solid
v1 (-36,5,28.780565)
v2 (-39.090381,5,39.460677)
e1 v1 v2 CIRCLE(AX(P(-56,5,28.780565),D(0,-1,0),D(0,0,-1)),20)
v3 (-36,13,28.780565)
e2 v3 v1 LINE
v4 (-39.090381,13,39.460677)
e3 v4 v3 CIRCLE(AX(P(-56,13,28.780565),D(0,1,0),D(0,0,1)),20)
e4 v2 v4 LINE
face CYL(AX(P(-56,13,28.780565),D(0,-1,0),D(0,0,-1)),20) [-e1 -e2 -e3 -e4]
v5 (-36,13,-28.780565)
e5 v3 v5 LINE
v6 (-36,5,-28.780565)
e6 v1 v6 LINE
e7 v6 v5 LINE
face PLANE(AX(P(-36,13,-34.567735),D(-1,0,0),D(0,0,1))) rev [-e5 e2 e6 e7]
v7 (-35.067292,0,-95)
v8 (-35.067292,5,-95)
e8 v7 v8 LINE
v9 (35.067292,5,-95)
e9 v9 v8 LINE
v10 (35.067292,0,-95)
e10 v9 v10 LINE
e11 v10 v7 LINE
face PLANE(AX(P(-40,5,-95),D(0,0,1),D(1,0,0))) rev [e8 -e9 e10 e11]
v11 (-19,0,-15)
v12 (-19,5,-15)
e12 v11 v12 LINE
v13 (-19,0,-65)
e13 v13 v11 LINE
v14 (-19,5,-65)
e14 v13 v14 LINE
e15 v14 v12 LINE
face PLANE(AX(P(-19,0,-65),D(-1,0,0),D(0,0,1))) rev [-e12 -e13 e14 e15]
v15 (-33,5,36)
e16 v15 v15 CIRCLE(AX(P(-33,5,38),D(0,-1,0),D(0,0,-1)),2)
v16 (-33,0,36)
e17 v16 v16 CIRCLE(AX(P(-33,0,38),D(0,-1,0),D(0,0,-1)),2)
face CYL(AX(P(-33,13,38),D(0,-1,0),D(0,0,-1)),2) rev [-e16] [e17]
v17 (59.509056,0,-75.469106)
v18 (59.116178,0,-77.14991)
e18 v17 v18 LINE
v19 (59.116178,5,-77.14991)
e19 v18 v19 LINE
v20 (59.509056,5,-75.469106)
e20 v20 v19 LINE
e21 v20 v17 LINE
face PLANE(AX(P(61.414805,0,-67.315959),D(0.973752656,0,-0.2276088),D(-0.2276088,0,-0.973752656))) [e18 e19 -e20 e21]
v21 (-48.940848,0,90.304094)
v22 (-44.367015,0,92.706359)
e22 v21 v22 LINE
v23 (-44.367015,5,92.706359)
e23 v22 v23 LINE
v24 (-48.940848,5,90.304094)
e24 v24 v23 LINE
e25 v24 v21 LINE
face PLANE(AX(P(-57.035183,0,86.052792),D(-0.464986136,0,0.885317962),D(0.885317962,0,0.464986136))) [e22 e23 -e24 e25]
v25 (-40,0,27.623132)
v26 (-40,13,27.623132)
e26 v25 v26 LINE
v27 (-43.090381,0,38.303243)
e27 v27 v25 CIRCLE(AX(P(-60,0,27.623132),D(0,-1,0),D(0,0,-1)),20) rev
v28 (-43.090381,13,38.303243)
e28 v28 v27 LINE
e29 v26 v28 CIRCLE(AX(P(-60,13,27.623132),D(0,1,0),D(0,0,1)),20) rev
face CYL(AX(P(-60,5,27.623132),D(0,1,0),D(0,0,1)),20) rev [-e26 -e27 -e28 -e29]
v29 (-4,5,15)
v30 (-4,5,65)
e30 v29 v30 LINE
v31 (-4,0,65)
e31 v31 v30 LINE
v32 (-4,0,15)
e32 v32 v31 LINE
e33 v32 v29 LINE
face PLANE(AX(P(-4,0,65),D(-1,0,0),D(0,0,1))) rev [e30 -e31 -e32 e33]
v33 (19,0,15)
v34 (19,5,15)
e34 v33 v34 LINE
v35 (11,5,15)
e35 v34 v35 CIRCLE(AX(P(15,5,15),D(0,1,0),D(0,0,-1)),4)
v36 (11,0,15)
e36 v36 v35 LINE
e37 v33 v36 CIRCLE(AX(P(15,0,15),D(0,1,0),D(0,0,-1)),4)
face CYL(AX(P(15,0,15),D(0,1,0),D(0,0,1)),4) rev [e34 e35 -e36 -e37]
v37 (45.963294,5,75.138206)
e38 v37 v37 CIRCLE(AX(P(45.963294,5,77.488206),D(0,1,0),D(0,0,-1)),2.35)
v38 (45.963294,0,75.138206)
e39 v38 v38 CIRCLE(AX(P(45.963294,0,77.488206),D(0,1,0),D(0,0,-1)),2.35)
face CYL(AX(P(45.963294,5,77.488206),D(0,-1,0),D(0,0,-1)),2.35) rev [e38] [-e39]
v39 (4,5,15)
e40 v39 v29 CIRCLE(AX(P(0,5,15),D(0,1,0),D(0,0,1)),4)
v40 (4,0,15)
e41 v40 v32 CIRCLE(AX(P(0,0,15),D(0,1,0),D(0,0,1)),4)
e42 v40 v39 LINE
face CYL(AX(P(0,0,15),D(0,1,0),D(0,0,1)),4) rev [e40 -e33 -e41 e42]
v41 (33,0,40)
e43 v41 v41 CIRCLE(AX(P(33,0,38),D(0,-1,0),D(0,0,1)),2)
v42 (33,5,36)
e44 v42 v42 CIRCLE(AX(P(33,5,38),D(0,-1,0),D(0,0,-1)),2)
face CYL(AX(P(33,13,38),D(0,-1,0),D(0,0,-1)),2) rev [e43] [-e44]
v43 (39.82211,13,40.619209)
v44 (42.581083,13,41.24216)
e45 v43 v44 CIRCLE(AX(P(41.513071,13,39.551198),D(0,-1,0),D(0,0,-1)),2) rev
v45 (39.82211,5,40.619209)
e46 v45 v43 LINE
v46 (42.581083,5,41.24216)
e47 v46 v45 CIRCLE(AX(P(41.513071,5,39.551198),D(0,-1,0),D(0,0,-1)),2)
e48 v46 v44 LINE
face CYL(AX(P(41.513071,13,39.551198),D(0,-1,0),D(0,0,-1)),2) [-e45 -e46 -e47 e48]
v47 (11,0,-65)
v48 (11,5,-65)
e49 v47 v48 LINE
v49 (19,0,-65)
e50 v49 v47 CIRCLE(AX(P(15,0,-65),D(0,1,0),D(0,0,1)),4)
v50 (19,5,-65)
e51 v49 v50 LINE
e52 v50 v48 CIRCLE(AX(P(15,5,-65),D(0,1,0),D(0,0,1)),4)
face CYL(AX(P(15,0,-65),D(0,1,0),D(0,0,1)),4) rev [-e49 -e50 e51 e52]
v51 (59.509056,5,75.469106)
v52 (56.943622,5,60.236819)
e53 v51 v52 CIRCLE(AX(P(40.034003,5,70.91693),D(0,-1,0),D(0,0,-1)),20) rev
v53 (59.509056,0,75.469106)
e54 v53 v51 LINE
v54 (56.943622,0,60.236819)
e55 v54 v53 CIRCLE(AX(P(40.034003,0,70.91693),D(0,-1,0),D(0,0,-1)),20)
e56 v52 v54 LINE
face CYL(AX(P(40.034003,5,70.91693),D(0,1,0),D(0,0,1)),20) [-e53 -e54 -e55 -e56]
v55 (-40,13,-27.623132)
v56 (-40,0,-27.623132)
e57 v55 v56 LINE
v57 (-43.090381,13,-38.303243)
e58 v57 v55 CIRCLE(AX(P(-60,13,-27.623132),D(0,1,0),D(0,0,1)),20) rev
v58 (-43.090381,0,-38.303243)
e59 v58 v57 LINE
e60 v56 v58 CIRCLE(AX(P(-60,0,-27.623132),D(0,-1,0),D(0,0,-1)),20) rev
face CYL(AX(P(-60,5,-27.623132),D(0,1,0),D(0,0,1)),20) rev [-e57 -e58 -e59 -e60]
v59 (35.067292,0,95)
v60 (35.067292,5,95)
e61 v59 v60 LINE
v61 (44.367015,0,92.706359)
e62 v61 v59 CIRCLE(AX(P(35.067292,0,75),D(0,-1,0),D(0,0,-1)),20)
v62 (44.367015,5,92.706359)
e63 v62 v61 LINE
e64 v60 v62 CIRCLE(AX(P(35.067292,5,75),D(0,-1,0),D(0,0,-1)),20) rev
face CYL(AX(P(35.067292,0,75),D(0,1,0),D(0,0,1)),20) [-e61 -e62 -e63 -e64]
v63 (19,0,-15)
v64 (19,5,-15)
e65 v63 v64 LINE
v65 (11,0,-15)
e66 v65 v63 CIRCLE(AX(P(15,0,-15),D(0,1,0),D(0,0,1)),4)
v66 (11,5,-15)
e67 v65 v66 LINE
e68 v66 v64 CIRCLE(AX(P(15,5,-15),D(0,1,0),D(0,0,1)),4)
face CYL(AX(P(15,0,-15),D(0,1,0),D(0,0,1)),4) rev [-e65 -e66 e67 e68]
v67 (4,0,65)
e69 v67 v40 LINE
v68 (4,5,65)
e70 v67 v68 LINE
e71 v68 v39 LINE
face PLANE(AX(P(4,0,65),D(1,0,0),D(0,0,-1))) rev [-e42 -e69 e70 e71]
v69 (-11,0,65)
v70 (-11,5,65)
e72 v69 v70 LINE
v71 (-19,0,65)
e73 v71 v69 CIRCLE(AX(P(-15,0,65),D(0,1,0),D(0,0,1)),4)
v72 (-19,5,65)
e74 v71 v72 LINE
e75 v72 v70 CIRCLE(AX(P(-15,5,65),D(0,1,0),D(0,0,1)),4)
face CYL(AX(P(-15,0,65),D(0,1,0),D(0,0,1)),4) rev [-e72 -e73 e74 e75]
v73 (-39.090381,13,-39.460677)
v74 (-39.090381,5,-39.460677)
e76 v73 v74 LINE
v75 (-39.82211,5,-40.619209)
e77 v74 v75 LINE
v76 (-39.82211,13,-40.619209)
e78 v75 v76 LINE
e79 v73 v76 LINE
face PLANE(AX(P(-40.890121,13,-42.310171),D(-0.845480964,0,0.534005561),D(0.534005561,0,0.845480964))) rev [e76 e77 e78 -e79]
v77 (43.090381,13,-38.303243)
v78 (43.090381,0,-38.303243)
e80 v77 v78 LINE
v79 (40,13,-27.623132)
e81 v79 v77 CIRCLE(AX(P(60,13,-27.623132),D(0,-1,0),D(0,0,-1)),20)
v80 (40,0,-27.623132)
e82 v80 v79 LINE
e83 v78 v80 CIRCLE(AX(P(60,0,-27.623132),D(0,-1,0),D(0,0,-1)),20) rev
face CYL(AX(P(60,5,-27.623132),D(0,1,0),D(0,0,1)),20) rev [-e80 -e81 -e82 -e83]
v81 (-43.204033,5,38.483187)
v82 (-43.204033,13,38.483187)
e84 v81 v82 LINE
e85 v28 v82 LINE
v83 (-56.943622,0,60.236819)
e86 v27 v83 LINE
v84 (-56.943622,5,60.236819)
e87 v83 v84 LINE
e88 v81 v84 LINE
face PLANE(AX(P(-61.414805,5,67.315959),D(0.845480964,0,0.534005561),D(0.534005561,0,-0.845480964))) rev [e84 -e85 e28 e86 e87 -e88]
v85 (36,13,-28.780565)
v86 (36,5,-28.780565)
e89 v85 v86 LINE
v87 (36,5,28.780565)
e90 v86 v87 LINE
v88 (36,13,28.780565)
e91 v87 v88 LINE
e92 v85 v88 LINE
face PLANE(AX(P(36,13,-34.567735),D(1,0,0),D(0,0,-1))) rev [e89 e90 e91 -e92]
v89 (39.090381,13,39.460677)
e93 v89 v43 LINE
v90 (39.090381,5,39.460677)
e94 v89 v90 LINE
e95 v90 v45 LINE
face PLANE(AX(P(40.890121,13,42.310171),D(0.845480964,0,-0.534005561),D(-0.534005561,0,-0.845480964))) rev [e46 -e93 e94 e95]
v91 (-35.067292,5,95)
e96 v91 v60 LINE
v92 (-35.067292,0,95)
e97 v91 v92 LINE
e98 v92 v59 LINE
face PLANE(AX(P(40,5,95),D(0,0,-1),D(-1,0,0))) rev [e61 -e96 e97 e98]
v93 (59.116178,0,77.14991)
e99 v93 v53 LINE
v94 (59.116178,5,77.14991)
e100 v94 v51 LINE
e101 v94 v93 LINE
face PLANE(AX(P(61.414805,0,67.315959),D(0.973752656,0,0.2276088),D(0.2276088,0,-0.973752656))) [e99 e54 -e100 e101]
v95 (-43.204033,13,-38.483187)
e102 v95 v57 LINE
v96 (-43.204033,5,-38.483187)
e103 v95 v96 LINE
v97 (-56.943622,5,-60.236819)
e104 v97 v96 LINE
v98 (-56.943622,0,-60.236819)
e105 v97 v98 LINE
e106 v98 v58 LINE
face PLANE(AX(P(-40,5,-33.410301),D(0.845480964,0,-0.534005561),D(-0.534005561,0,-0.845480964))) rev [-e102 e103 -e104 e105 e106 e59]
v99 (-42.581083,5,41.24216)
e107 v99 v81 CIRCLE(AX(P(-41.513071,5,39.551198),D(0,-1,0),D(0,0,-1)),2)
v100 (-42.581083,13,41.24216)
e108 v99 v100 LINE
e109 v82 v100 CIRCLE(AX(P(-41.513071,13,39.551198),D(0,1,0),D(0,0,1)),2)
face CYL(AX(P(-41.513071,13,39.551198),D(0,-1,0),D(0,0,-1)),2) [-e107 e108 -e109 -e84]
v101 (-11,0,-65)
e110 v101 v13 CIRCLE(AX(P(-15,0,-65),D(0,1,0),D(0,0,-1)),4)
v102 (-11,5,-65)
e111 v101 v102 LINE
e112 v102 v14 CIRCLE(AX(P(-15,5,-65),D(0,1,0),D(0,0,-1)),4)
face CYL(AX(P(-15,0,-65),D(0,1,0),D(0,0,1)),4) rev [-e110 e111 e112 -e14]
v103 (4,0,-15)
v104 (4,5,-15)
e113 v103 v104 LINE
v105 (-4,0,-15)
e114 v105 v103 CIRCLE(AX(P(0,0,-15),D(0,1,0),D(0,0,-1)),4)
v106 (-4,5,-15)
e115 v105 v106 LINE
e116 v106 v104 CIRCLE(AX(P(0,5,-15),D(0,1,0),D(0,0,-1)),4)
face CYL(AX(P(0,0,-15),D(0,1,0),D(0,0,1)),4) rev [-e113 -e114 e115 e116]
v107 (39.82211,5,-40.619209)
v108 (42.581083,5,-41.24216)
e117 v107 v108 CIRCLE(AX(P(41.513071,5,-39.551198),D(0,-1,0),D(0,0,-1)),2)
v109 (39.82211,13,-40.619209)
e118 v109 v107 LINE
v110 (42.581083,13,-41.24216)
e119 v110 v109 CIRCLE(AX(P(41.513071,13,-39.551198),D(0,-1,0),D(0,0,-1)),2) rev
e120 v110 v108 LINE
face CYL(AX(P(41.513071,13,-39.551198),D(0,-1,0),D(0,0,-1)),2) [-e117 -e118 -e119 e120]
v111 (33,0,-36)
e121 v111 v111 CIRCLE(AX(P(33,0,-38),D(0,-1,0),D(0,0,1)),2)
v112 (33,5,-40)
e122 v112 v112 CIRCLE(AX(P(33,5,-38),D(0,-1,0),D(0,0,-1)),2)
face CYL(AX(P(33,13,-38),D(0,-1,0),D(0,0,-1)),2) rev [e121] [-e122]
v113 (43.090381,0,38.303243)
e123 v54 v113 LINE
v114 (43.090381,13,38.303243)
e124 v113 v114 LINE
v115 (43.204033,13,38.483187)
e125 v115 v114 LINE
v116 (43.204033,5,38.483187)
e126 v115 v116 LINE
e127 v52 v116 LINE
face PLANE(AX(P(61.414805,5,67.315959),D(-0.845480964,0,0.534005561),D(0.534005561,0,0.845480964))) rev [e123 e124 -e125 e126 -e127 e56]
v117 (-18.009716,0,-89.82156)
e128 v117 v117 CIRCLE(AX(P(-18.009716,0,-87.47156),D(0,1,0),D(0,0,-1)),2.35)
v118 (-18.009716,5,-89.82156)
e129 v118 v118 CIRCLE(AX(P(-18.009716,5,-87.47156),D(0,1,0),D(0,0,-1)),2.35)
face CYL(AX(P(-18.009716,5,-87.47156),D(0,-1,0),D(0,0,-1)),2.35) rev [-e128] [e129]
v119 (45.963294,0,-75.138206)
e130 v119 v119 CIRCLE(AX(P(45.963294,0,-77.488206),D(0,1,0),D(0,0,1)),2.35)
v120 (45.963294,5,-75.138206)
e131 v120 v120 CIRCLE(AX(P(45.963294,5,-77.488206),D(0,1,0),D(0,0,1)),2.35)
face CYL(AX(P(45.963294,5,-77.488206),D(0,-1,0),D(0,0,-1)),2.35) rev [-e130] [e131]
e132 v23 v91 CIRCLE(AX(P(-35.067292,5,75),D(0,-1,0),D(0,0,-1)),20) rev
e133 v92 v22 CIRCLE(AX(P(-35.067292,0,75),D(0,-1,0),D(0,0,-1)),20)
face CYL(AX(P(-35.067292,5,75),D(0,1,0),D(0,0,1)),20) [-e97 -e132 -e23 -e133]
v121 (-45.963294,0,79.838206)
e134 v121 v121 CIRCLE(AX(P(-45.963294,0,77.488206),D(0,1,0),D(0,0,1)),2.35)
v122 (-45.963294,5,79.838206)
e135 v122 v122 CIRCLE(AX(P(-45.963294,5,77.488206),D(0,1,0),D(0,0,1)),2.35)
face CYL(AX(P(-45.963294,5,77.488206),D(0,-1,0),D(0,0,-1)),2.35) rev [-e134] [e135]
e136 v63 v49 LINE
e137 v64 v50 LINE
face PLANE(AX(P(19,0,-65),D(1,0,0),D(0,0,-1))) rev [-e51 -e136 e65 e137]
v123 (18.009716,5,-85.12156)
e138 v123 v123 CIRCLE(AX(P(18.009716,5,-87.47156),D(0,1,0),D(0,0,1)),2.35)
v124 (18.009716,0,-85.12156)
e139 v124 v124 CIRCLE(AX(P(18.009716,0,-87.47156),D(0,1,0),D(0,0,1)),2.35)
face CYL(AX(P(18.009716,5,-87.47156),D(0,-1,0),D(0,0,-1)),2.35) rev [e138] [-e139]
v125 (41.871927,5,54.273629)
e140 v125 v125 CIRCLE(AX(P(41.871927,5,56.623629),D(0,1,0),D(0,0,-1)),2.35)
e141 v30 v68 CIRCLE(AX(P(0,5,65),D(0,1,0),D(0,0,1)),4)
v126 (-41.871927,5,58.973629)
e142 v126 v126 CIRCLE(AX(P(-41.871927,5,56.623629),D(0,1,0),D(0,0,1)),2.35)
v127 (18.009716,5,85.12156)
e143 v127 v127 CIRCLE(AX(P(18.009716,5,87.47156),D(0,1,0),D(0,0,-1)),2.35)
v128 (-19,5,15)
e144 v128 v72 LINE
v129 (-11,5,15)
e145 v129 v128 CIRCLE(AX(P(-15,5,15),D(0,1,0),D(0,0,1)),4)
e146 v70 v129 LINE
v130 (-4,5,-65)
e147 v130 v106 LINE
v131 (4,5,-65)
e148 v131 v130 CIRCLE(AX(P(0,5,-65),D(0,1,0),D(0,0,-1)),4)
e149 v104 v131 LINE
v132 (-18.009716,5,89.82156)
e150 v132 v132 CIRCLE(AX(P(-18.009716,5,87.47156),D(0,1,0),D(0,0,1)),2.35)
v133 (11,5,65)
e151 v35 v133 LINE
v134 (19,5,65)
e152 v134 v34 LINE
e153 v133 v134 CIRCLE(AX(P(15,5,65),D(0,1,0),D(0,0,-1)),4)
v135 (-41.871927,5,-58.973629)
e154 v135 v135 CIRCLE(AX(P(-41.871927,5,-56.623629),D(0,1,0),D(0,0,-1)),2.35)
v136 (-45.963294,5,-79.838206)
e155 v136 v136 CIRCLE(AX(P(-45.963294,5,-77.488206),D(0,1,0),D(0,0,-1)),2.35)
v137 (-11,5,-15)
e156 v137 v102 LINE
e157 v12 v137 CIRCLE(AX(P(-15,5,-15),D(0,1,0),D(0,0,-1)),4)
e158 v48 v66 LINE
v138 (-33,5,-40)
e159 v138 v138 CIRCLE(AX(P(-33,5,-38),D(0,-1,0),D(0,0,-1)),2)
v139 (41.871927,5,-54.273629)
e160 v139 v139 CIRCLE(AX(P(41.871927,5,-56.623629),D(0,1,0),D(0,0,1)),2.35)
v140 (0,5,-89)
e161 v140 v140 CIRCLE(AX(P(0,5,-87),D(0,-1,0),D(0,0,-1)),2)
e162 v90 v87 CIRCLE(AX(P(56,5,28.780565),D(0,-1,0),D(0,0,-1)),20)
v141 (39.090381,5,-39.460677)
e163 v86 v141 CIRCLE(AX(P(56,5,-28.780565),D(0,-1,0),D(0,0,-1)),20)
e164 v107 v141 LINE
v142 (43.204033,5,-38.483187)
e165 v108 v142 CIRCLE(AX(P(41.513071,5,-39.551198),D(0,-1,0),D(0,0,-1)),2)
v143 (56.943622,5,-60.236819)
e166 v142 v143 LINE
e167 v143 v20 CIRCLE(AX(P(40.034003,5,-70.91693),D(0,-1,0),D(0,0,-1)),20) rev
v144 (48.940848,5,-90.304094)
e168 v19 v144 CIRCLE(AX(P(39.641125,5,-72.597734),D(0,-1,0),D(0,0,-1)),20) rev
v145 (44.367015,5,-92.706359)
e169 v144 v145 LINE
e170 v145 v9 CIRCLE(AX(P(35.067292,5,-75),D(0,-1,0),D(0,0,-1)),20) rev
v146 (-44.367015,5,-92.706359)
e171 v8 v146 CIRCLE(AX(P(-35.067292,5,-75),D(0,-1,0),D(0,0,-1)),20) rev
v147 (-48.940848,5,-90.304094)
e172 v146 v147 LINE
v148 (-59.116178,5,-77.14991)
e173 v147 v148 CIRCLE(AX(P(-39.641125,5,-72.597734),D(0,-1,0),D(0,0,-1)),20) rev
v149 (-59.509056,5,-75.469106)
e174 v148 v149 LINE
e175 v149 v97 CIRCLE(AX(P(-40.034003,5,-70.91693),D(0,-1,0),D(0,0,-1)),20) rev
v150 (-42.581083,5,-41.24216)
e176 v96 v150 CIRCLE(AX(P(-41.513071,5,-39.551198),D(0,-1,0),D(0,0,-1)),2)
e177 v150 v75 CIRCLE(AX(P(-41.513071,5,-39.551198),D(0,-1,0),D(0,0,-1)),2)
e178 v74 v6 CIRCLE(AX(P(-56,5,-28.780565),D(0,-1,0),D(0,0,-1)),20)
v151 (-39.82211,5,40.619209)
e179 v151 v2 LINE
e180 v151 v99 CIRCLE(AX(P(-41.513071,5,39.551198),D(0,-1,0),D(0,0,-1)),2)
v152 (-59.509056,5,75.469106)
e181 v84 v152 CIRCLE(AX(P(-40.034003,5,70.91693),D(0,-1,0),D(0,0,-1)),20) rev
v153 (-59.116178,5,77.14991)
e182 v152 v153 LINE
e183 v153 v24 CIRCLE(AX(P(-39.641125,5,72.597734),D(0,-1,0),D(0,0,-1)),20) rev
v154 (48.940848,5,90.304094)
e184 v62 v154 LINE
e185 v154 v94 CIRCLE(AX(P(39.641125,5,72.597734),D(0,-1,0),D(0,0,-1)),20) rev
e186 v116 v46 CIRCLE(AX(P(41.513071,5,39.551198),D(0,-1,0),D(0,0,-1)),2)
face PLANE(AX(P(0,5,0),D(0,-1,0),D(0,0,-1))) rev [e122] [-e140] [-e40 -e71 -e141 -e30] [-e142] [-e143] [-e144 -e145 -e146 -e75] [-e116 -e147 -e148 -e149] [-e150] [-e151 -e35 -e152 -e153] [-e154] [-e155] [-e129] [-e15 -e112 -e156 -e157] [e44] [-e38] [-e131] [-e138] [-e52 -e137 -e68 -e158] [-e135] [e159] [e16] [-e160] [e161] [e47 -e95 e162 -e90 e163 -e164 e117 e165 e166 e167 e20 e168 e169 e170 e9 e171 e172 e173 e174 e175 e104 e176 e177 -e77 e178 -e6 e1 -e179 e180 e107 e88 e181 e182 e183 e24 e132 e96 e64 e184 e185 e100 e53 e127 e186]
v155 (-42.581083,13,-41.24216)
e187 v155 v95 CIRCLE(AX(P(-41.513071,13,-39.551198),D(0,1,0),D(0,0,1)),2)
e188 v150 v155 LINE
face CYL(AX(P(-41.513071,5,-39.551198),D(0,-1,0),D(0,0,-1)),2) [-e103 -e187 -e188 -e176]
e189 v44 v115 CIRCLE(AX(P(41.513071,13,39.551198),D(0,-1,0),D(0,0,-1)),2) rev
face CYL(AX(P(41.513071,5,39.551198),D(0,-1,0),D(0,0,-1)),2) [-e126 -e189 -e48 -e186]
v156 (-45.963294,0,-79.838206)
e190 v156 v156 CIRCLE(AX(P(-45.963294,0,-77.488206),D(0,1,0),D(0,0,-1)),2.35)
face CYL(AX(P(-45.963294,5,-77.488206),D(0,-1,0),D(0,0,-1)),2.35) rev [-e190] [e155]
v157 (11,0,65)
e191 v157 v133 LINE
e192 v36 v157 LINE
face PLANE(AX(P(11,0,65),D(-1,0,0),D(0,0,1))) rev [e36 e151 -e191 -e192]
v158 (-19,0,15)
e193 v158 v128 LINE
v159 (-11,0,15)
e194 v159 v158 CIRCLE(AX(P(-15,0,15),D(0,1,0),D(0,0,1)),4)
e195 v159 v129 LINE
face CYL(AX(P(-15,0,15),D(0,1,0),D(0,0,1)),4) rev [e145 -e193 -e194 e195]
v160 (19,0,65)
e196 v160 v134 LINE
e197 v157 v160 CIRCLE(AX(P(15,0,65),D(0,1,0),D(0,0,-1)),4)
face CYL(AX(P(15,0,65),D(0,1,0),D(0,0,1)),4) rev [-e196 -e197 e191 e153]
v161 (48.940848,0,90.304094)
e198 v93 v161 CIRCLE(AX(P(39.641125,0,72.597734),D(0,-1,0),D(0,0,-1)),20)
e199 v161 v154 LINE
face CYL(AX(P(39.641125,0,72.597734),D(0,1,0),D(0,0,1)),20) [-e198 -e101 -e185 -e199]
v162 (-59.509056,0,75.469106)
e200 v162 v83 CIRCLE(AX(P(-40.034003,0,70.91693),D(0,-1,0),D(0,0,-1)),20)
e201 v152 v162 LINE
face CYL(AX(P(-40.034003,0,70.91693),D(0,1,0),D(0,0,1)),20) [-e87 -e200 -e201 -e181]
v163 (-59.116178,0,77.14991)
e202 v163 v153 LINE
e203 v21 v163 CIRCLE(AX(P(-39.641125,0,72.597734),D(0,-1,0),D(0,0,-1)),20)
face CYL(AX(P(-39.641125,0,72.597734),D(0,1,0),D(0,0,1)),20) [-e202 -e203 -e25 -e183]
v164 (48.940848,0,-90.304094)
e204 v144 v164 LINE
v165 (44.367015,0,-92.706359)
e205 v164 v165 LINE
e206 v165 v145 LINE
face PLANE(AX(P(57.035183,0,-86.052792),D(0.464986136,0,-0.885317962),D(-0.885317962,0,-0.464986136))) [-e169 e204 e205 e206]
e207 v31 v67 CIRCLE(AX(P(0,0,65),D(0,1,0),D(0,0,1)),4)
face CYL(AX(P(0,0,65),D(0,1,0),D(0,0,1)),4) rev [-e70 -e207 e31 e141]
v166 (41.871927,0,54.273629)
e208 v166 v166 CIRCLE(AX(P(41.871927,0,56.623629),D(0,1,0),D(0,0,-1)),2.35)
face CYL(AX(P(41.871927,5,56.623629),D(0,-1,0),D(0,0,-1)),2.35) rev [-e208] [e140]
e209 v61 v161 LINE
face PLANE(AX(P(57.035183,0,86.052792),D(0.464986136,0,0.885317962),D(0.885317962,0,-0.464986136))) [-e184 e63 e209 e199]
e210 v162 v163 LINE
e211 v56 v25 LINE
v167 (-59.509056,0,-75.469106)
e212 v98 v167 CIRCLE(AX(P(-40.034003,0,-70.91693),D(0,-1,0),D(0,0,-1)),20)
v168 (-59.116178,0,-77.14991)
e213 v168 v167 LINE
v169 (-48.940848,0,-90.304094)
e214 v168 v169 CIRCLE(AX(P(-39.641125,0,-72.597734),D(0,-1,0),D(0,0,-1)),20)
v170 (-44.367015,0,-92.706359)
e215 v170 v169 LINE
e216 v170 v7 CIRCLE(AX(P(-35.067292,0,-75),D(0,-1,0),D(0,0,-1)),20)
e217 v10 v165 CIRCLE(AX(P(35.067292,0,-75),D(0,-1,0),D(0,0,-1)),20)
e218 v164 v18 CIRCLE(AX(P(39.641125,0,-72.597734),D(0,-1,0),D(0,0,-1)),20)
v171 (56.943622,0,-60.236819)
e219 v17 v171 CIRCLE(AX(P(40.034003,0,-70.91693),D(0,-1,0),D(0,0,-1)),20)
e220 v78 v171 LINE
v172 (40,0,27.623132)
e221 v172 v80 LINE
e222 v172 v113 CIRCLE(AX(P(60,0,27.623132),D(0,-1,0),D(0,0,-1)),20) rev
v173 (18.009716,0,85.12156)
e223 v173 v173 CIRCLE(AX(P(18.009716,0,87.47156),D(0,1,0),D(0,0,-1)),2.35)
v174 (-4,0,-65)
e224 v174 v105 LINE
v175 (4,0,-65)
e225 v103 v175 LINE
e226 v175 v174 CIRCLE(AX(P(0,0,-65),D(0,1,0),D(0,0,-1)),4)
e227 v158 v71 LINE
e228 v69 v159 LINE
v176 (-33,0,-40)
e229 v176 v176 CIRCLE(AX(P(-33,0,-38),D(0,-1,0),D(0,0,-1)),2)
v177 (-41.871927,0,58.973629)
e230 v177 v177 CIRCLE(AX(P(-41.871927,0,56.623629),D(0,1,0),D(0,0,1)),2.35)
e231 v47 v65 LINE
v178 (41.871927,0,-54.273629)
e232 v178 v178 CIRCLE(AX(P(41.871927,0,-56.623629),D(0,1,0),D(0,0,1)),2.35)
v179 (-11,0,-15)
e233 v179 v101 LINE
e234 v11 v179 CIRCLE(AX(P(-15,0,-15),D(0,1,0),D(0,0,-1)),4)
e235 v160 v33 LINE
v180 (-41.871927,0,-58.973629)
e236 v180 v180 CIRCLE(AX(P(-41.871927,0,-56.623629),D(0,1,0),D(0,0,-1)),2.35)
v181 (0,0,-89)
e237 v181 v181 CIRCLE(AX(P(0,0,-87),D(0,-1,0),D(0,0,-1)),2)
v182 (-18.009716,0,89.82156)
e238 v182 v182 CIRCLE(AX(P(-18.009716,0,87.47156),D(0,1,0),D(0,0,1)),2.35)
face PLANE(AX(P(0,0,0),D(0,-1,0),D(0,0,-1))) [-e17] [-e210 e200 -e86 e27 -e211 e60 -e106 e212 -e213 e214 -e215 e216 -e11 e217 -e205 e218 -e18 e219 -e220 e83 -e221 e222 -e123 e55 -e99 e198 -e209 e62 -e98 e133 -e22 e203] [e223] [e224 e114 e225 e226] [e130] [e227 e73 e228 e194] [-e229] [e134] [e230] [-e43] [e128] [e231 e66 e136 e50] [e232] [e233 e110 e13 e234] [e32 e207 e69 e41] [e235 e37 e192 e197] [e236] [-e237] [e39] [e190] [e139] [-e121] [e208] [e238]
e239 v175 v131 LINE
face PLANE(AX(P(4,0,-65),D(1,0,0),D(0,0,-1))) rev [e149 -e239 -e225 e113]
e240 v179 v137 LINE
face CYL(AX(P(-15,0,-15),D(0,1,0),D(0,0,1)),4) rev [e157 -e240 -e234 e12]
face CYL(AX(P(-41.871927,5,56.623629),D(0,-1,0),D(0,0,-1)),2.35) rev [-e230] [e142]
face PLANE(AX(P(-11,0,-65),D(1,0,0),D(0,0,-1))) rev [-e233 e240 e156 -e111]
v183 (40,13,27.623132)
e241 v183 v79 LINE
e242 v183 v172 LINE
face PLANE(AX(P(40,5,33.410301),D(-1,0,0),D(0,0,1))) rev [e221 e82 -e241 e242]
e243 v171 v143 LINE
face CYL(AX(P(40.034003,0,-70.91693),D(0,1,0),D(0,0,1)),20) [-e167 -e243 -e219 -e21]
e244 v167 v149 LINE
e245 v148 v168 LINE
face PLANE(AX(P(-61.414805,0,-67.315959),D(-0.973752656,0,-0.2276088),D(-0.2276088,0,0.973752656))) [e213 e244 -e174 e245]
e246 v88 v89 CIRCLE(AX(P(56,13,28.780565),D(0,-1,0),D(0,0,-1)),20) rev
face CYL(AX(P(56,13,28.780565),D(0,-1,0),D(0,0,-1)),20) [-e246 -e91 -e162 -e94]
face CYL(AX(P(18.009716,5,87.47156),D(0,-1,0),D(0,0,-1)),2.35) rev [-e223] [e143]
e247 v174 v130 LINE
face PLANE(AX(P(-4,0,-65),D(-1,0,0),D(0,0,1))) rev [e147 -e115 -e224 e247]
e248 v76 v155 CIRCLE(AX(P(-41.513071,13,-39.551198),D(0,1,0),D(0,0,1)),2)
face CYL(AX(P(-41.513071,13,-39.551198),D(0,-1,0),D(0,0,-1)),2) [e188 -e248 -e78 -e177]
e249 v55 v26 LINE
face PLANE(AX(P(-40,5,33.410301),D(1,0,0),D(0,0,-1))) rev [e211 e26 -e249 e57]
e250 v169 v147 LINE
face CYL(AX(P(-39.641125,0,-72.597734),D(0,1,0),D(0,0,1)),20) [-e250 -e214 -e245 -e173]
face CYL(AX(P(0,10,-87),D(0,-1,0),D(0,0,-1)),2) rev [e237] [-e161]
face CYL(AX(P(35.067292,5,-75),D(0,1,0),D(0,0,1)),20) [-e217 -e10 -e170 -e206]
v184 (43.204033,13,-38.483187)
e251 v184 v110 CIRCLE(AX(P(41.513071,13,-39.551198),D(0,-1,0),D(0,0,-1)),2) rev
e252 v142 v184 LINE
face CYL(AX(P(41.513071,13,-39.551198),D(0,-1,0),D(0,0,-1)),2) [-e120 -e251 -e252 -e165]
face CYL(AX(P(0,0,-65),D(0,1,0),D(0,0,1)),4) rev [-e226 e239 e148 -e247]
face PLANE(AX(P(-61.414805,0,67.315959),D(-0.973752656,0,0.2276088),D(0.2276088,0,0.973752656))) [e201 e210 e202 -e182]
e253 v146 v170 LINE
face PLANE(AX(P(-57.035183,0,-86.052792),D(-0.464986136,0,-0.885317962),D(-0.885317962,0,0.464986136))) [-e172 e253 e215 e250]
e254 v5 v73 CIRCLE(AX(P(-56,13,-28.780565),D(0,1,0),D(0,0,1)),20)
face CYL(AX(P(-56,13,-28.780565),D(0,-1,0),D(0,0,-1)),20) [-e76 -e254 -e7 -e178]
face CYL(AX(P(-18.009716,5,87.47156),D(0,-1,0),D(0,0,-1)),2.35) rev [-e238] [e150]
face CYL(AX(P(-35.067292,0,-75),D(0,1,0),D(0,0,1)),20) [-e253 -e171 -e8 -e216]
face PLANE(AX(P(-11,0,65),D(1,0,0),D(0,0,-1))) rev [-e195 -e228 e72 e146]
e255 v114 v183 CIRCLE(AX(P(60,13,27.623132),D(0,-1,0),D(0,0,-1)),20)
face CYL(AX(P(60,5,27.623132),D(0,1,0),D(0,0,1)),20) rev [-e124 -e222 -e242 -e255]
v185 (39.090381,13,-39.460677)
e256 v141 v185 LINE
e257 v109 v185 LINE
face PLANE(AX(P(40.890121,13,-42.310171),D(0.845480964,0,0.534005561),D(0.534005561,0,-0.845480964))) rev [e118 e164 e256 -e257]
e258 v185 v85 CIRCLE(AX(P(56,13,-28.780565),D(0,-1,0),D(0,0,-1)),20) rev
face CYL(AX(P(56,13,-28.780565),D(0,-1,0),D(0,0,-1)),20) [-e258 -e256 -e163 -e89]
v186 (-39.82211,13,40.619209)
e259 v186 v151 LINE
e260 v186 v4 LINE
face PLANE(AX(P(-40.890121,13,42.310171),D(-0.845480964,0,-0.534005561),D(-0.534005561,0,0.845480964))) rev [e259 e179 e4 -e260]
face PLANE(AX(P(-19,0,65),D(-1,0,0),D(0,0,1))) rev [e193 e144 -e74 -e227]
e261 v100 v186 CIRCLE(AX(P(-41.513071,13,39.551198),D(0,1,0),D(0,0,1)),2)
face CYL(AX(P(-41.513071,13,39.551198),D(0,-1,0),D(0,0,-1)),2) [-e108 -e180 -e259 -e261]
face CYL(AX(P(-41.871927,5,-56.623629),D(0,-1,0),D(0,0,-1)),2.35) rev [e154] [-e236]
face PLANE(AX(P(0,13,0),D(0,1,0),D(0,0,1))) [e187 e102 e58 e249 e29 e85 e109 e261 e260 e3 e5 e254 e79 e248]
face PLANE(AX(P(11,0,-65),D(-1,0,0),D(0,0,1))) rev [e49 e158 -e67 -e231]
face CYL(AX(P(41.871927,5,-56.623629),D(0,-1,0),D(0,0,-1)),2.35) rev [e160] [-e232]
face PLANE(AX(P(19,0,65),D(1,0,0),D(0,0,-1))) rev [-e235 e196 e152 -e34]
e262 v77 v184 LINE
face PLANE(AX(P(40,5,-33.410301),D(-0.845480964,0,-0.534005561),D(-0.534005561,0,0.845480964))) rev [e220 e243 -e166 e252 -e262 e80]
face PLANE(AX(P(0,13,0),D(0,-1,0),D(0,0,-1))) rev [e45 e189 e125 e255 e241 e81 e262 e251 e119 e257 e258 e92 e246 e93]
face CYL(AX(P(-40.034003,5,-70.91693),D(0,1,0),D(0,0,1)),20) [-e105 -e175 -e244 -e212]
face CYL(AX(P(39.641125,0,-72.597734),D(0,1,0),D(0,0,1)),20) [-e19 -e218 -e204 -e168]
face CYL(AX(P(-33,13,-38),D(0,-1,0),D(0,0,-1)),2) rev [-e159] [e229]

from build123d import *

# Parameters (mm, degrees)
ESQUISSE1_R             = 2.3500000000000014
ESQUISSE1_R_2           = 2.3499999999999983
ESQUISSE1_R_3           = 2.349999999999996
BOSS_EXTRU_1_DEPTH      = 5
BOSS_EXTRU_2_DEPTH      = 8
CONG_3_R                = 2
CONG_4_R                = 20
ESQUISSE4_R             = 2.0000000000000036
ENL_V_MAT_EXTRU_1_DEPTH = 114.86737128447481
CONG_5_R                = 20
ENL_V_MAT_EXTRU_2_DEPTH = 114.40537131563231
BOSS_EXTRU_3_DEPTH      = 5
CONG_6_R                = 20
CONG_7_R                = 20
ESQUISSE7_R             = 2.000000000000001
ENL_V_MAT_EXTRU_3_DEPTH = 10


with BuildPart() as part:
    # Esquisse1 → Boss.-Extru.1 (new body)
    with BuildSketch(Plane(origin=(0, 0, 0), x_dir=(1, 0, 0), z_dir=(0, 1, 0))):
        Polygon((39.99999999999999, -95.00000000000003), (-40, -95.00000000000001), (-61.41480475615327, -67.3159587983287), (-40, -33.41030108504288), (-40, 33.41030108504288), (-61.41480475615327, 67.31595879832868), (-39.99999999999999, 95.00000000000001), (39.99999999999999, 95.00000000000003), (61.414804756153316, 67.31595879832868), (40.000000000000014, 33.41030108504289), (40.000000000000014, -33.41030108504289), (61.414804756153316, -67.31595879832868), align=None)
        with Locations(Location((18.009715939773823, 87.47156012506183, 0), (0, 0, 270))):
            Circle(ESQUISSE1_R, mode=Mode.SUBTRACT)
        with Locations(Location((45.96329382727553, 77.48820598648535, 0), (0, 0, 270))):
            Circle(ESQUISSE1_R_2, mode=Mode.SUBTRACT)
        with Locations(Location((41.871926953773496, 56.623628500342335, 0), (0, 0, 270))):
            Circle(ESQUISSE1_R_3, mode=Mode.SUBTRACT)
        with Locations(Location((-41.871926953773496, 56.623628500342335, 0), (0, 0, 90))):
            Circle(ESQUISSE1_R_3, mode=Mode.SUBTRACT)
        with Locations(Location((-45.96329382727553, 77.48820598648535, 0), (0, 0, 90))):
            Circle(ESQUISSE1_R_2, mode=Mode.SUBTRACT)
        with Locations(Location((-18.009715939773823, 87.47156012506183, 0), (0, 0, 90))):
            Circle(ESQUISSE1_R, mode=Mode.SUBTRACT)
        with Locations(Location((41.871926953773496, -56.623628500342335, 0), (0, 0, 90))):
            Circle(ESQUISSE1_R_3, mode=Mode.SUBTRACT)
        with Locations(Location((45.963293827275415, -77.48820598648535, 0), (0, 0, 90))):
            Circle(ESQUISSE1_R_2, mode=Mode.SUBTRACT)
        with Locations(Location((18.00971593977377, -87.47156012506183, 0), (0, 0, 90))):
            Circle(ESQUISSE1_R, mode=Mode.SUBTRACT)
        with Locations(Location((-18.00971593977388, -87.47156012506183, 0), (0, 0, 270))):
            Circle(ESQUISSE1_R, mode=Mode.SUBTRACT)
        with Locations(Location((-45.96329382727556, -77.48820598648535, 0), (0, 0, 270))):
            Circle(ESQUISSE1_R_2, mode=Mode.SUBTRACT)
        with Locations(Location((-41.871926953773496, -56.623628500342335, 0), (0, 0, 270))):
            Circle(ESQUISSE1_R_3, mode=Mode.SUBTRACT)
    extrude(amount=BOSS_EXTRU_1_DEPTH)

    # Esquisse3 → Boss.-Extru.2 (add)
    with BuildSketch(Plane(origin=(0, 5, 0), x_dir=(1, 0, 0), z_dir=(0, 1, 0))):
        Polygon((40.000000000000014, -33.41030108504289), (40.000000000000014, 33.41030108504289), (44.27204448885784, 40.174148798084595), (40.89012063233698, 42.31017104251351), (36.00000000000002, 34.567734993029916), (36.00000000000003, -34.56773499302995), (40.89012063233698, -42.31017104251351), (44.27204448885783, -40.174148798084595), align=None)
        Polygon((-40.89012063233699, -42.31017104251351), (-36.00000000000003, -34.56773499302995), (-36.00000000000002, 34.567734993029916), (-40.89012063233698, 42.31017104251351), (-44.272044488857844, 40.174148798084595), (-40.000000000000014, 33.41030108504289), (-40.000000000000014, -33.41030108504289), (-44.27204448885783, -40.174148798084595), align=None)
    extrude(amount=BOSS_EXTRU_2_DEPTH)

    # Congé3
    cong_3_edges = [part.edges().sort_by_distance(p)[0] for p in [
        (-40.89012063233698, 9, -42.31017104251351),
        (-44.272044488857844, 9, -40.174148798084595),
        (-44.27204448885783, 9, 40.174148798084595),
        (-40.89012063233699, 9, 42.31017104251351),
        (40.89012063233698, 9, 42.31017104251351),
        (44.27204448885783, 9, 40.174148798084595),
        (40.89012063233698, 9, -42.31017104251351),
        (44.27204448885784, 9, -40.174148798084595),
    ]]
    fillet(cong_3_edges, radius=CONG_3_R - 0.0001)  # a hair under: the kernel refuses the full size

    # Congé4
    cong_4_edges = [part.edges().sort_by_distance(p)[0] for p in [
        (-40.00000000000001, 6.5, 33.41030108504289),
        (-40.00000000000001, 6.5, -33.41030108504289),
        (40.000000000000014, 6.5, -33.41030108504289),
        (40.000000000000014, 6.5, 33.41030108504289),
    ]]
    fillet(cong_4_edges, radius=CONG_4_R)

    # Esquisse4 → Enlèv. mat.-Extru.1 (cut, through all)
    with BuildSketch(Plane(origin=(0, 0, 0), x_dir=(-1, 0, 0), z_dir=(0, -1, 0))):
        with Locations(Location((32.99999999999999, -38.000000000000014, 0), (0, 0, 90))):
            Circle(ESQUISSE4_R)
        with Locations(Location((33.00000000000002, 38, 0), (0, 0, 90))):
            Circle(ESQUISSE4_R)
        with Locations(Location((-32.99999999999999, -38.000000000000014, 0), (0, 0, 90))):
            Circle(ESQUISSE4_R)
        with Locations(Location((-33.00000000000002, 38, 0), (0, 0, 90))):
            Circle(ESQUISSE4_R)
    extrude(amount=-ENL_V_MAT_EXTRU_1_DEPTH, mode=Mode.SUBTRACT)

    # Congé5
    cong_5_edges = [part.edges().sort_by_distance(p)[0] for p in [
        (-36.00000000000003, 9, 34.56773499302995),
        (-36.00000000000002, 9, -34.567734993029916),
        (36.00000000000002, 9, -34.567734993029916),
        (36.00000000000003, 9, 34.56773499302995),
    ]]
    fillet(cong_5_edges, radius=CONG_5_R)

    # Esquisse5 → Enlèv. mat.-Extru.2 (cut, through all)
    with BuildSketch(Plane(origin=(0, 5, 0), x_dir=(1, 0, 0), z_dir=(0, 1, 0))):
        with BuildLine():
            Line((-19, -65), (-19.00000000000001, -15))
            ThreePointArc((-19.00000000000001, -15), (-15.000000000000002, -10.999999999999979), (-10.999999999999988, -15.000000000000014))
            Line((-10.999999999999988, -15.000000000000014), (-10.999999999999979, -64.99999999999999))
            ThreePointArc((-10.999999999999979, -64.99999999999999), (-14.999999999999993, -69), (-19, -65))
        make_face()
        with BuildLine():
            Line((19.00000000000002, -64.99999999999999), (19.00000000000001, -15))
            ThreePointArc((19.00000000000001, -15), (15.000000000000005, -10.999999999999961), (10.99999999999997, -15.000000000000007))
            Line((10.99999999999997, -15.000000000000007), (10.999999999999979, -64.99999999999999))
            ThreePointArc((10.999999999999979, -64.99999999999999), (15.000000000000016, -68.99999999999999), (19.00000000000002, -64.99999999999999))
        make_face()
        with BuildLine():
            Line((19.00000000000002, 64.99999999999999), (19.00000000000001, 15))
            ThreePointArc((19.00000000000001, 15), (15.000000000000009, 10.99999999999998), (10.99999999999999, 15))
            Line((10.99999999999999, 15), (10.999999999999979, 64.99999999999999))
            ThreePointArc((10.999999999999979, 64.99999999999999), (15.000000000000016, 68.99999999999999), (19.00000000000002, 64.99999999999999))
        make_face()
        with BuildLine():
            Line((-19.00000000000002, 64.99999999999999), (-19.00000000000001, 15))
            ThreePointArc((-19.00000000000001, 15), (-15.000000000000009, 10.99999999999998), (-10.99999999999999, 15))
            Line((-10.99999999999999, 15), (-10.999999999999979, 64.99999999999999))
            ThreePointArc((-10.999999999999979, 64.99999999999999), (-15.000000000000016, 68.99999999999999), (-19.00000000000002, 64.99999999999999))
        make_face()
        with BuildLine():
            Line((-4, -64.99999999999999), (-4, -15))
            ThreePointArc((-4, -15), (2.4e-16, -11), (4, -15))
            Line((4, -15), (4, -64.99999999999999))
            ThreePointArc((4, -64.99999999999999), (-7.3e-16, -68.99999999999999), (-4, -64.99999999999999))
        make_face()
        with BuildLine():
            Line((-4, 64.99999999999999), (-4, 15))
            ThreePointArc((-4, 15), (2.4e-16, 11), (4, 15))
            Line((4, 15), (4, 64.99999999999999))
            ThreePointArc((4, 64.99999999999999), (2.4e-16, 68.99999999999999), (-4, 64.99999999999999))
        make_face()
    extrude(amount=-ENL_V_MAT_EXTRU_2_DEPTH, mode=Mode.SUBTRACT)

    # Esquisse6 → Boss.-Extru.3 (add)
    with BuildSketch(Plane(origin=(0, 5, 0), x_dir=(1, 0, 0), z_dir=(0, 1, 0))):
        Polygon((-61.41480475615327, 67.31595879832868), (-57.03518322417293, 86.05279191485651), (-39.99999999999999, 95.00000000000001), align=None)
        Polygon((57.03518322417293, 86.05279191485651), (39.99999999999999, 95.00000000000001), (61.41480475615327, 67.31595879832868), align=None)
        Polygon((61.41480475615317, -67.31595879832868), (57.03518322417293, -86.05279191485651), (39.999999999999886, -95.00000000000001), align=None)
        Polygon((-57.03518322417293, -86.05279191485651), (-40.00000000000002, -95.00000000000001), (-61.4148047561533, -67.31595879832868), align=None)
    extrude(amount=-BOSS_EXTRU_3_DEPTH)

    # Congé6
    cong_6_edges = [part.edges().sort_by_distance(p)[0] for p in [
        (-57.03518322417293, 2.5, -86.05279191485651),
        (57.03518322417293, 2.5, -86.05279191485651),
        (57.03518322417293, 2.5, 86.05279191485651),
        (-57.03518322417293, 2.5, 86.05279191485651),
    ]]
    fillet(cong_6_edges, radius=CONG_6_R)

    # Congé7
    cong_7_edges = [part.edges().sort_by_distance(p)[0] for p in [
        (-40, 2.5, 95.00000000000001),
        (-61.41480475615327, 2.5, 67.3159587983287),
        (39.99999999999999, 2.5, 95.00000000000003),
        (61.414804756153316, 2.5, 67.31595879832868),
        (61.414804756153316, 2.5, -67.31595879832868),
        (39.99999999999999, 2.5, -95.00000000000003),
        (-61.41480475615327, 2.5, -67.31595879832868),
        (-39.99999999999999, 2.5, -95.00000000000001),
    ]]
    fillet(cong_7_edges, radius=CONG_7_R)

    # Esquisse7 → Enlèv. mat.-Extru.3 (cut)
    with BuildSketch(Plane(origin=(0, 0, 0), x_dir=(-1, 0, 0), z_dir=(0, -1, 0))):
        with Locations(Location((3.47e-15, 86.99999999999997, 0), (0, 0, 90))):
            Circle(ESQUISSE7_R)
    extrude(amount=-ENL_V_MAT_EXTRU_3_DEPTH, mode=Mode.SUBTRACT)


solid = part.part
